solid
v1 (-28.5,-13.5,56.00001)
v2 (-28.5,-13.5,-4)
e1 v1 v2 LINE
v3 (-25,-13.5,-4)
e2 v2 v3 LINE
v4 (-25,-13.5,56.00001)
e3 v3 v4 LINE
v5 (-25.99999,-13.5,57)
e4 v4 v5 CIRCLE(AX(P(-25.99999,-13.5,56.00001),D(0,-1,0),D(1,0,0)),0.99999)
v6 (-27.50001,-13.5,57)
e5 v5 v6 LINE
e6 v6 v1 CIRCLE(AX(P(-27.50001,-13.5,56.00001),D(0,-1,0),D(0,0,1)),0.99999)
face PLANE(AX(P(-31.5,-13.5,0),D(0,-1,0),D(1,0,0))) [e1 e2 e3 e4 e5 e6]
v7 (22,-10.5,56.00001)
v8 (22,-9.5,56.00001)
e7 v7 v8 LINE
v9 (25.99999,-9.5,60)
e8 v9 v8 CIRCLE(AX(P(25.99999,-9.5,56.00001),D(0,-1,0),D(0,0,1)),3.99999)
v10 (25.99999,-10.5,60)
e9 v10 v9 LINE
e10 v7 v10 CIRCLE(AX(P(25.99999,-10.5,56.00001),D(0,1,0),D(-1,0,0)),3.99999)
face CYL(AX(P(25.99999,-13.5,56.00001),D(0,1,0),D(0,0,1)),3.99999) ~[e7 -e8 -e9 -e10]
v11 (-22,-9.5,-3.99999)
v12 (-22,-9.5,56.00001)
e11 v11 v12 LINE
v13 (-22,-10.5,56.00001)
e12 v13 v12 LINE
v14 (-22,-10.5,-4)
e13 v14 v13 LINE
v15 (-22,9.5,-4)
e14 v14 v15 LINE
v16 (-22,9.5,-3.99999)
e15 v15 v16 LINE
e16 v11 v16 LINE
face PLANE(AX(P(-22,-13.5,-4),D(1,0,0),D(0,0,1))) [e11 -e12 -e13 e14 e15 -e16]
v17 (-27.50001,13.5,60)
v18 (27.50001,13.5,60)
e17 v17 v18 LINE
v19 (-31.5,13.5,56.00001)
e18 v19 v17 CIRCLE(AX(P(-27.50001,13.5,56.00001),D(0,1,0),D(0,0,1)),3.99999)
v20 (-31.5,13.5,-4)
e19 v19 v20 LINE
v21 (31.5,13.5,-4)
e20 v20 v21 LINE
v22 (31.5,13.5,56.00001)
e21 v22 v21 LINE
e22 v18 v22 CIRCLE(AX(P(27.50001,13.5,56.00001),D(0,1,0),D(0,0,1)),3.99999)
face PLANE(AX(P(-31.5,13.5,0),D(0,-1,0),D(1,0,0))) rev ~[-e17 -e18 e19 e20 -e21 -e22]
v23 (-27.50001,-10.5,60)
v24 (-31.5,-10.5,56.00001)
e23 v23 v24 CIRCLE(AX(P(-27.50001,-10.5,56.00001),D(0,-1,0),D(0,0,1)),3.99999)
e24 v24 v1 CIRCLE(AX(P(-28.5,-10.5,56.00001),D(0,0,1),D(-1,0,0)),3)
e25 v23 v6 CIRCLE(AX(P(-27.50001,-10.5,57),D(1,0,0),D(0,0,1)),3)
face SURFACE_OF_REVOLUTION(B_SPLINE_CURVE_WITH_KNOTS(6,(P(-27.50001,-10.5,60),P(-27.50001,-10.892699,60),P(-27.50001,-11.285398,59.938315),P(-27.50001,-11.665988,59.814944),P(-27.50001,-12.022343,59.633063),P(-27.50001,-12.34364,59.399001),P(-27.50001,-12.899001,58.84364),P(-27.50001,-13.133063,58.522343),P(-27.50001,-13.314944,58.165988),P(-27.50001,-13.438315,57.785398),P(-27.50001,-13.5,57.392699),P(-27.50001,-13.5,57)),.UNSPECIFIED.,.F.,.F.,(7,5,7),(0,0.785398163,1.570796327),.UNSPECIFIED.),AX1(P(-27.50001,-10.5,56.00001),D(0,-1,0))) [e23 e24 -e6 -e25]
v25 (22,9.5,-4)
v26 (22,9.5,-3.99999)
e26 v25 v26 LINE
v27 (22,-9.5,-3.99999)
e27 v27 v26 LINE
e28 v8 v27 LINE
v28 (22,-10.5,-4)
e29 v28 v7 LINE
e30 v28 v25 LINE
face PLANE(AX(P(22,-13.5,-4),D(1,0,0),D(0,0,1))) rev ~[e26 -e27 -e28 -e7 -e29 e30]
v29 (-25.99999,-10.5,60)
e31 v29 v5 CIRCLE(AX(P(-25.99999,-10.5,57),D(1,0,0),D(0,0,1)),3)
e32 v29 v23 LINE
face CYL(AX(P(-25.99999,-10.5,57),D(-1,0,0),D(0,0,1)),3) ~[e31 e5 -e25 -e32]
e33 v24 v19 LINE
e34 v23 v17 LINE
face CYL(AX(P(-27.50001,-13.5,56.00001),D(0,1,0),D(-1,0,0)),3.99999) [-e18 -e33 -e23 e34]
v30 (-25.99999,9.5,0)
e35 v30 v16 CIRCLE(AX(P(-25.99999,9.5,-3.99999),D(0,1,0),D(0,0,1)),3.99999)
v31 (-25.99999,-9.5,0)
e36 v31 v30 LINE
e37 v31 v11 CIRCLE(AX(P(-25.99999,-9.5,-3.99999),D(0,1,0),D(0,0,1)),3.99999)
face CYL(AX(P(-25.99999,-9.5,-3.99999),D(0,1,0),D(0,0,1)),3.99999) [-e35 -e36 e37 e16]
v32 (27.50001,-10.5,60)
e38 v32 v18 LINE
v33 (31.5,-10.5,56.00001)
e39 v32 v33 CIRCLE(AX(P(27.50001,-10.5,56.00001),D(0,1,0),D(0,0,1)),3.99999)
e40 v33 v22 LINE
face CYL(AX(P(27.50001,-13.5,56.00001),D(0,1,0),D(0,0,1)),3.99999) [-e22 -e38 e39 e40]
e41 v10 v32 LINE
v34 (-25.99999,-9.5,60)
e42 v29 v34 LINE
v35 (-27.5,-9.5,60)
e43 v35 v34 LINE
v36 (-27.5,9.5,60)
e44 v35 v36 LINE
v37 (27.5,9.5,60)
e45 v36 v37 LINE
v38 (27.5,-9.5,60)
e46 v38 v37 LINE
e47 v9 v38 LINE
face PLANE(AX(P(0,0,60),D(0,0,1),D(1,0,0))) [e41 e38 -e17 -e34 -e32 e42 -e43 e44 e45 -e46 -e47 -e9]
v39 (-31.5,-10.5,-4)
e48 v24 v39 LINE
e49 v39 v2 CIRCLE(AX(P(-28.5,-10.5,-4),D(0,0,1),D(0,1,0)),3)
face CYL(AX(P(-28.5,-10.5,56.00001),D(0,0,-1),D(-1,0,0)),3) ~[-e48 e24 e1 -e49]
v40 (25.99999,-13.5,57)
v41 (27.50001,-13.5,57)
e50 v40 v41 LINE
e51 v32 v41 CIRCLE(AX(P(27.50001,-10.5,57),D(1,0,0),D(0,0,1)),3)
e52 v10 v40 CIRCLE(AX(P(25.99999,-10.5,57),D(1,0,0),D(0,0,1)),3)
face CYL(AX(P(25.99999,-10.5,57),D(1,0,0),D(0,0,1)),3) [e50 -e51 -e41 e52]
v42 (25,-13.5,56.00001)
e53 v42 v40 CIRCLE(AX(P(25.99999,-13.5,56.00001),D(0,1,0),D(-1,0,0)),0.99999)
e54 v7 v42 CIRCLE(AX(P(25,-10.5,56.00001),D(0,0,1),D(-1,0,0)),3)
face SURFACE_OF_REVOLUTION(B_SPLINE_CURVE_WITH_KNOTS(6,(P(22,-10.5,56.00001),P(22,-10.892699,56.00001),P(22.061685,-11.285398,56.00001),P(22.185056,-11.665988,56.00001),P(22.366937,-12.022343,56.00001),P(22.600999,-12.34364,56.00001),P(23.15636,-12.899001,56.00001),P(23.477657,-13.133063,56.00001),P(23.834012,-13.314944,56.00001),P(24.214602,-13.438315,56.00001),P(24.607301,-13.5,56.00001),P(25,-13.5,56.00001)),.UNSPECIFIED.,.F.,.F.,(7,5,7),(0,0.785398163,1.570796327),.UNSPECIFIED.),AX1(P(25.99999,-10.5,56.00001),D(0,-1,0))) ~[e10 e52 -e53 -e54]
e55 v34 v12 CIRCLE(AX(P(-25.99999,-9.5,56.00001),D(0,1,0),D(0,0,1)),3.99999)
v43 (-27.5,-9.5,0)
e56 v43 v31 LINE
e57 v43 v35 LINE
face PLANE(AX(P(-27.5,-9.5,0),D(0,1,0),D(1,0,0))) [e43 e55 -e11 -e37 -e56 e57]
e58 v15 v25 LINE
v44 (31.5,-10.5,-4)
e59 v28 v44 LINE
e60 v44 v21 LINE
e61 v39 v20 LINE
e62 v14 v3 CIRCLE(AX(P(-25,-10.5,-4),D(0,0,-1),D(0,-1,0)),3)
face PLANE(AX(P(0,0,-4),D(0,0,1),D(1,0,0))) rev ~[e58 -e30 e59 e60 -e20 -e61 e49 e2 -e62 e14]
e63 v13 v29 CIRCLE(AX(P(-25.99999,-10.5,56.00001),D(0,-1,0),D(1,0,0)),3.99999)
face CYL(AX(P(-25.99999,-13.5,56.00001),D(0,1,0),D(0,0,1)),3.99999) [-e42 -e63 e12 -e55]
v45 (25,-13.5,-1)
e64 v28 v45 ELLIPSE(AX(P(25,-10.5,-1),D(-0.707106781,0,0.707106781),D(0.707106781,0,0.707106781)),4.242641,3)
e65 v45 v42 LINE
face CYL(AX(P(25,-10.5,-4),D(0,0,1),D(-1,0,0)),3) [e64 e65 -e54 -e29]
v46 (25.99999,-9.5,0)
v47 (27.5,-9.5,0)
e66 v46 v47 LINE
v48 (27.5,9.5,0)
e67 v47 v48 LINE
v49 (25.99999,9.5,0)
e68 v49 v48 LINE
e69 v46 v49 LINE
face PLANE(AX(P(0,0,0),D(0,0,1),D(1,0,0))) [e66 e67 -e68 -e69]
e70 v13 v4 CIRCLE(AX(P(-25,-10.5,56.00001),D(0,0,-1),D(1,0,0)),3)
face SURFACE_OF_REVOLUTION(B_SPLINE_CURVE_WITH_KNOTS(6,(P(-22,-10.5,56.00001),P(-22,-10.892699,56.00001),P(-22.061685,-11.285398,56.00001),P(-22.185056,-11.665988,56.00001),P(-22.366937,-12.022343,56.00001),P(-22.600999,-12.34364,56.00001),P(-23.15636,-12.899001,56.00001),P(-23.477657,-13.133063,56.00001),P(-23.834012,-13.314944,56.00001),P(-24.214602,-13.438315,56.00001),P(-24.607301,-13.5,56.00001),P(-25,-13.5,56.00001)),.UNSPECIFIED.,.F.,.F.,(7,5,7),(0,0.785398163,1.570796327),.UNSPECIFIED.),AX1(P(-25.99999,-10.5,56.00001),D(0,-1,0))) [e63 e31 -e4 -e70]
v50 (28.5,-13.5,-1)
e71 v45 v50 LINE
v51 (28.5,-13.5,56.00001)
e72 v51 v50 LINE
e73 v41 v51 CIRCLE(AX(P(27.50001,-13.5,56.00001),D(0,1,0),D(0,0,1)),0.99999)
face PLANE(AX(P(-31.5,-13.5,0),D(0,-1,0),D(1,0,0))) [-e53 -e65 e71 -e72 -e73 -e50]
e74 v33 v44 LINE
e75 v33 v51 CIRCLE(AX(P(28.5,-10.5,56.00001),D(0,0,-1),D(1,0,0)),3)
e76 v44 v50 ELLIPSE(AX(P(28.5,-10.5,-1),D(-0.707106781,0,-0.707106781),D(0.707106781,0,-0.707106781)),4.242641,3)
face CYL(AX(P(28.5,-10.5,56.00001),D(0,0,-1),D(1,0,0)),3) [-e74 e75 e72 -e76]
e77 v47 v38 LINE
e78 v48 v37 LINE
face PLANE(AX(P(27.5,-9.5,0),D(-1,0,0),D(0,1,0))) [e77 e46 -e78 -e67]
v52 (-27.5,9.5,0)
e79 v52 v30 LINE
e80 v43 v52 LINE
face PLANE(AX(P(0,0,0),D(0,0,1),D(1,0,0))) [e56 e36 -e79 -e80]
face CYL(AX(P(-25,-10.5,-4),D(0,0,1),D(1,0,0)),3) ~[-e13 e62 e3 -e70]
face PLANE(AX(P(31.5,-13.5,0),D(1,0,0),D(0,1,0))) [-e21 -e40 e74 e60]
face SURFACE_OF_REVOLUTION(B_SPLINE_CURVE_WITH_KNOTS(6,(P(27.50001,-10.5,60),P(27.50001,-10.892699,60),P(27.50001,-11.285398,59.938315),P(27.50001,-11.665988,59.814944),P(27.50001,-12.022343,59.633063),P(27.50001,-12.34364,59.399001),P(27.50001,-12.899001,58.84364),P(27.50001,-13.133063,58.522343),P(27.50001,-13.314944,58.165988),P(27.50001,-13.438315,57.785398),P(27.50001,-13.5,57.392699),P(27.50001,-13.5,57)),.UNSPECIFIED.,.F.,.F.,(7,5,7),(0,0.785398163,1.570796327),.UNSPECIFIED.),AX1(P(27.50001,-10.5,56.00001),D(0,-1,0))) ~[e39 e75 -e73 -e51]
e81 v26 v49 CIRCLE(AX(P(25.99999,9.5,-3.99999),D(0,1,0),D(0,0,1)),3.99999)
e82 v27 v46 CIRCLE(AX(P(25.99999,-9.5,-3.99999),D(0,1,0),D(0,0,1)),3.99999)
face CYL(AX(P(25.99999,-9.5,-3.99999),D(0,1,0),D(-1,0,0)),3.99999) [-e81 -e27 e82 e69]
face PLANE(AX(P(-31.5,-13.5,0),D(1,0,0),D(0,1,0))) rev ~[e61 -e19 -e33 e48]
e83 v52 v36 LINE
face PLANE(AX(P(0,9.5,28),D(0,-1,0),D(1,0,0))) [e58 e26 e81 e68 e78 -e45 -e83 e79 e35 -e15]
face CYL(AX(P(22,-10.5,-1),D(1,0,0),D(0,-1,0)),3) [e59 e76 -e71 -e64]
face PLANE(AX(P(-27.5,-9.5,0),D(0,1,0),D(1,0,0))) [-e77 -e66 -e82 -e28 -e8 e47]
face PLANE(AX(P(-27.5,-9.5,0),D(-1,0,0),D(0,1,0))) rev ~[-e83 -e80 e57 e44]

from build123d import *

# Parameters (mm, degrees)
F0_W     = 63
F0_H     = 27
F0_W_2   = 55
F0_H_2   = 19
F1_DEPTH = 60
F2_DEPTH = 4
F3_W     = 44
F3_H     = 64
F4_DEPTH = 23
F5_R     = 3.99999
F6_R     = 3


# Not quite as in the source:
# - a fillet or chamfer is up to 0.001 mm smaller than in the source, because OpenCascade refuses the exact size


with BuildPart() as f1:
    # F0 (on Top) → F1 (new body)
    with BuildSketch(Plane.XY):
        Rectangle(F0_W, F0_H)
        Rectangle(F0_W_2, F0_H_2, mode=Mode.SUBTRACT)
    extrude(amount=F1_DEPTH)

    # F0 (on Top) → F2 (join)
    with BuildSketch(Plane.XY):
        Rectangle(F0_W, F0_H)
        Rectangle(F0_W_2, F0_H_2, mode=Mode.SUBTRACT)
        Rectangle(F0_W_2, F0_H_2)
    extrude(amount=-F2_DEPTH)

    # F3 (on face) → F4 (cut)
    with BuildSketch(Plane.XZ.offset(13.5)):
        with Locations((0, 28)):
            Rectangle(F3_W, F3_H)
    extrude(amount=-F4_DEPTH, mode=Mode.SUBTRACT)

    # F5 (radius 4 in the source; OpenCascade refuses exactly that, so slightly less here)
    f5_edges = [f1.edges().sort_by_distance(p)[0] for p in [
        (-22, -11.5, 60),
        (-22, 0, 0),
        (22, 0, 0),
        (-31.5, 0, 60),
        (31.5, 0, 60),
        (22, -11.5, 60),
    ]]
    fillet(f5_edges, radius=F5_R)

    # F6
    f6_edges = [f1.edges().sort_by_distance(p)[0] for p in [
        (-22, -13.5, 26.000005),
        (22, -13.5, 26.000005),
        (23.17157, -13.5, 58.82843),
        (26.75, -13.5, -4),
        (26.75, -13.5, 60),
        (31.5, -13.5, 26.000005),
        (30.32843, -13.5, 58.82843),
    ]]
    fillet(f6_edges, radius=F6_R)


solid = f1.part
